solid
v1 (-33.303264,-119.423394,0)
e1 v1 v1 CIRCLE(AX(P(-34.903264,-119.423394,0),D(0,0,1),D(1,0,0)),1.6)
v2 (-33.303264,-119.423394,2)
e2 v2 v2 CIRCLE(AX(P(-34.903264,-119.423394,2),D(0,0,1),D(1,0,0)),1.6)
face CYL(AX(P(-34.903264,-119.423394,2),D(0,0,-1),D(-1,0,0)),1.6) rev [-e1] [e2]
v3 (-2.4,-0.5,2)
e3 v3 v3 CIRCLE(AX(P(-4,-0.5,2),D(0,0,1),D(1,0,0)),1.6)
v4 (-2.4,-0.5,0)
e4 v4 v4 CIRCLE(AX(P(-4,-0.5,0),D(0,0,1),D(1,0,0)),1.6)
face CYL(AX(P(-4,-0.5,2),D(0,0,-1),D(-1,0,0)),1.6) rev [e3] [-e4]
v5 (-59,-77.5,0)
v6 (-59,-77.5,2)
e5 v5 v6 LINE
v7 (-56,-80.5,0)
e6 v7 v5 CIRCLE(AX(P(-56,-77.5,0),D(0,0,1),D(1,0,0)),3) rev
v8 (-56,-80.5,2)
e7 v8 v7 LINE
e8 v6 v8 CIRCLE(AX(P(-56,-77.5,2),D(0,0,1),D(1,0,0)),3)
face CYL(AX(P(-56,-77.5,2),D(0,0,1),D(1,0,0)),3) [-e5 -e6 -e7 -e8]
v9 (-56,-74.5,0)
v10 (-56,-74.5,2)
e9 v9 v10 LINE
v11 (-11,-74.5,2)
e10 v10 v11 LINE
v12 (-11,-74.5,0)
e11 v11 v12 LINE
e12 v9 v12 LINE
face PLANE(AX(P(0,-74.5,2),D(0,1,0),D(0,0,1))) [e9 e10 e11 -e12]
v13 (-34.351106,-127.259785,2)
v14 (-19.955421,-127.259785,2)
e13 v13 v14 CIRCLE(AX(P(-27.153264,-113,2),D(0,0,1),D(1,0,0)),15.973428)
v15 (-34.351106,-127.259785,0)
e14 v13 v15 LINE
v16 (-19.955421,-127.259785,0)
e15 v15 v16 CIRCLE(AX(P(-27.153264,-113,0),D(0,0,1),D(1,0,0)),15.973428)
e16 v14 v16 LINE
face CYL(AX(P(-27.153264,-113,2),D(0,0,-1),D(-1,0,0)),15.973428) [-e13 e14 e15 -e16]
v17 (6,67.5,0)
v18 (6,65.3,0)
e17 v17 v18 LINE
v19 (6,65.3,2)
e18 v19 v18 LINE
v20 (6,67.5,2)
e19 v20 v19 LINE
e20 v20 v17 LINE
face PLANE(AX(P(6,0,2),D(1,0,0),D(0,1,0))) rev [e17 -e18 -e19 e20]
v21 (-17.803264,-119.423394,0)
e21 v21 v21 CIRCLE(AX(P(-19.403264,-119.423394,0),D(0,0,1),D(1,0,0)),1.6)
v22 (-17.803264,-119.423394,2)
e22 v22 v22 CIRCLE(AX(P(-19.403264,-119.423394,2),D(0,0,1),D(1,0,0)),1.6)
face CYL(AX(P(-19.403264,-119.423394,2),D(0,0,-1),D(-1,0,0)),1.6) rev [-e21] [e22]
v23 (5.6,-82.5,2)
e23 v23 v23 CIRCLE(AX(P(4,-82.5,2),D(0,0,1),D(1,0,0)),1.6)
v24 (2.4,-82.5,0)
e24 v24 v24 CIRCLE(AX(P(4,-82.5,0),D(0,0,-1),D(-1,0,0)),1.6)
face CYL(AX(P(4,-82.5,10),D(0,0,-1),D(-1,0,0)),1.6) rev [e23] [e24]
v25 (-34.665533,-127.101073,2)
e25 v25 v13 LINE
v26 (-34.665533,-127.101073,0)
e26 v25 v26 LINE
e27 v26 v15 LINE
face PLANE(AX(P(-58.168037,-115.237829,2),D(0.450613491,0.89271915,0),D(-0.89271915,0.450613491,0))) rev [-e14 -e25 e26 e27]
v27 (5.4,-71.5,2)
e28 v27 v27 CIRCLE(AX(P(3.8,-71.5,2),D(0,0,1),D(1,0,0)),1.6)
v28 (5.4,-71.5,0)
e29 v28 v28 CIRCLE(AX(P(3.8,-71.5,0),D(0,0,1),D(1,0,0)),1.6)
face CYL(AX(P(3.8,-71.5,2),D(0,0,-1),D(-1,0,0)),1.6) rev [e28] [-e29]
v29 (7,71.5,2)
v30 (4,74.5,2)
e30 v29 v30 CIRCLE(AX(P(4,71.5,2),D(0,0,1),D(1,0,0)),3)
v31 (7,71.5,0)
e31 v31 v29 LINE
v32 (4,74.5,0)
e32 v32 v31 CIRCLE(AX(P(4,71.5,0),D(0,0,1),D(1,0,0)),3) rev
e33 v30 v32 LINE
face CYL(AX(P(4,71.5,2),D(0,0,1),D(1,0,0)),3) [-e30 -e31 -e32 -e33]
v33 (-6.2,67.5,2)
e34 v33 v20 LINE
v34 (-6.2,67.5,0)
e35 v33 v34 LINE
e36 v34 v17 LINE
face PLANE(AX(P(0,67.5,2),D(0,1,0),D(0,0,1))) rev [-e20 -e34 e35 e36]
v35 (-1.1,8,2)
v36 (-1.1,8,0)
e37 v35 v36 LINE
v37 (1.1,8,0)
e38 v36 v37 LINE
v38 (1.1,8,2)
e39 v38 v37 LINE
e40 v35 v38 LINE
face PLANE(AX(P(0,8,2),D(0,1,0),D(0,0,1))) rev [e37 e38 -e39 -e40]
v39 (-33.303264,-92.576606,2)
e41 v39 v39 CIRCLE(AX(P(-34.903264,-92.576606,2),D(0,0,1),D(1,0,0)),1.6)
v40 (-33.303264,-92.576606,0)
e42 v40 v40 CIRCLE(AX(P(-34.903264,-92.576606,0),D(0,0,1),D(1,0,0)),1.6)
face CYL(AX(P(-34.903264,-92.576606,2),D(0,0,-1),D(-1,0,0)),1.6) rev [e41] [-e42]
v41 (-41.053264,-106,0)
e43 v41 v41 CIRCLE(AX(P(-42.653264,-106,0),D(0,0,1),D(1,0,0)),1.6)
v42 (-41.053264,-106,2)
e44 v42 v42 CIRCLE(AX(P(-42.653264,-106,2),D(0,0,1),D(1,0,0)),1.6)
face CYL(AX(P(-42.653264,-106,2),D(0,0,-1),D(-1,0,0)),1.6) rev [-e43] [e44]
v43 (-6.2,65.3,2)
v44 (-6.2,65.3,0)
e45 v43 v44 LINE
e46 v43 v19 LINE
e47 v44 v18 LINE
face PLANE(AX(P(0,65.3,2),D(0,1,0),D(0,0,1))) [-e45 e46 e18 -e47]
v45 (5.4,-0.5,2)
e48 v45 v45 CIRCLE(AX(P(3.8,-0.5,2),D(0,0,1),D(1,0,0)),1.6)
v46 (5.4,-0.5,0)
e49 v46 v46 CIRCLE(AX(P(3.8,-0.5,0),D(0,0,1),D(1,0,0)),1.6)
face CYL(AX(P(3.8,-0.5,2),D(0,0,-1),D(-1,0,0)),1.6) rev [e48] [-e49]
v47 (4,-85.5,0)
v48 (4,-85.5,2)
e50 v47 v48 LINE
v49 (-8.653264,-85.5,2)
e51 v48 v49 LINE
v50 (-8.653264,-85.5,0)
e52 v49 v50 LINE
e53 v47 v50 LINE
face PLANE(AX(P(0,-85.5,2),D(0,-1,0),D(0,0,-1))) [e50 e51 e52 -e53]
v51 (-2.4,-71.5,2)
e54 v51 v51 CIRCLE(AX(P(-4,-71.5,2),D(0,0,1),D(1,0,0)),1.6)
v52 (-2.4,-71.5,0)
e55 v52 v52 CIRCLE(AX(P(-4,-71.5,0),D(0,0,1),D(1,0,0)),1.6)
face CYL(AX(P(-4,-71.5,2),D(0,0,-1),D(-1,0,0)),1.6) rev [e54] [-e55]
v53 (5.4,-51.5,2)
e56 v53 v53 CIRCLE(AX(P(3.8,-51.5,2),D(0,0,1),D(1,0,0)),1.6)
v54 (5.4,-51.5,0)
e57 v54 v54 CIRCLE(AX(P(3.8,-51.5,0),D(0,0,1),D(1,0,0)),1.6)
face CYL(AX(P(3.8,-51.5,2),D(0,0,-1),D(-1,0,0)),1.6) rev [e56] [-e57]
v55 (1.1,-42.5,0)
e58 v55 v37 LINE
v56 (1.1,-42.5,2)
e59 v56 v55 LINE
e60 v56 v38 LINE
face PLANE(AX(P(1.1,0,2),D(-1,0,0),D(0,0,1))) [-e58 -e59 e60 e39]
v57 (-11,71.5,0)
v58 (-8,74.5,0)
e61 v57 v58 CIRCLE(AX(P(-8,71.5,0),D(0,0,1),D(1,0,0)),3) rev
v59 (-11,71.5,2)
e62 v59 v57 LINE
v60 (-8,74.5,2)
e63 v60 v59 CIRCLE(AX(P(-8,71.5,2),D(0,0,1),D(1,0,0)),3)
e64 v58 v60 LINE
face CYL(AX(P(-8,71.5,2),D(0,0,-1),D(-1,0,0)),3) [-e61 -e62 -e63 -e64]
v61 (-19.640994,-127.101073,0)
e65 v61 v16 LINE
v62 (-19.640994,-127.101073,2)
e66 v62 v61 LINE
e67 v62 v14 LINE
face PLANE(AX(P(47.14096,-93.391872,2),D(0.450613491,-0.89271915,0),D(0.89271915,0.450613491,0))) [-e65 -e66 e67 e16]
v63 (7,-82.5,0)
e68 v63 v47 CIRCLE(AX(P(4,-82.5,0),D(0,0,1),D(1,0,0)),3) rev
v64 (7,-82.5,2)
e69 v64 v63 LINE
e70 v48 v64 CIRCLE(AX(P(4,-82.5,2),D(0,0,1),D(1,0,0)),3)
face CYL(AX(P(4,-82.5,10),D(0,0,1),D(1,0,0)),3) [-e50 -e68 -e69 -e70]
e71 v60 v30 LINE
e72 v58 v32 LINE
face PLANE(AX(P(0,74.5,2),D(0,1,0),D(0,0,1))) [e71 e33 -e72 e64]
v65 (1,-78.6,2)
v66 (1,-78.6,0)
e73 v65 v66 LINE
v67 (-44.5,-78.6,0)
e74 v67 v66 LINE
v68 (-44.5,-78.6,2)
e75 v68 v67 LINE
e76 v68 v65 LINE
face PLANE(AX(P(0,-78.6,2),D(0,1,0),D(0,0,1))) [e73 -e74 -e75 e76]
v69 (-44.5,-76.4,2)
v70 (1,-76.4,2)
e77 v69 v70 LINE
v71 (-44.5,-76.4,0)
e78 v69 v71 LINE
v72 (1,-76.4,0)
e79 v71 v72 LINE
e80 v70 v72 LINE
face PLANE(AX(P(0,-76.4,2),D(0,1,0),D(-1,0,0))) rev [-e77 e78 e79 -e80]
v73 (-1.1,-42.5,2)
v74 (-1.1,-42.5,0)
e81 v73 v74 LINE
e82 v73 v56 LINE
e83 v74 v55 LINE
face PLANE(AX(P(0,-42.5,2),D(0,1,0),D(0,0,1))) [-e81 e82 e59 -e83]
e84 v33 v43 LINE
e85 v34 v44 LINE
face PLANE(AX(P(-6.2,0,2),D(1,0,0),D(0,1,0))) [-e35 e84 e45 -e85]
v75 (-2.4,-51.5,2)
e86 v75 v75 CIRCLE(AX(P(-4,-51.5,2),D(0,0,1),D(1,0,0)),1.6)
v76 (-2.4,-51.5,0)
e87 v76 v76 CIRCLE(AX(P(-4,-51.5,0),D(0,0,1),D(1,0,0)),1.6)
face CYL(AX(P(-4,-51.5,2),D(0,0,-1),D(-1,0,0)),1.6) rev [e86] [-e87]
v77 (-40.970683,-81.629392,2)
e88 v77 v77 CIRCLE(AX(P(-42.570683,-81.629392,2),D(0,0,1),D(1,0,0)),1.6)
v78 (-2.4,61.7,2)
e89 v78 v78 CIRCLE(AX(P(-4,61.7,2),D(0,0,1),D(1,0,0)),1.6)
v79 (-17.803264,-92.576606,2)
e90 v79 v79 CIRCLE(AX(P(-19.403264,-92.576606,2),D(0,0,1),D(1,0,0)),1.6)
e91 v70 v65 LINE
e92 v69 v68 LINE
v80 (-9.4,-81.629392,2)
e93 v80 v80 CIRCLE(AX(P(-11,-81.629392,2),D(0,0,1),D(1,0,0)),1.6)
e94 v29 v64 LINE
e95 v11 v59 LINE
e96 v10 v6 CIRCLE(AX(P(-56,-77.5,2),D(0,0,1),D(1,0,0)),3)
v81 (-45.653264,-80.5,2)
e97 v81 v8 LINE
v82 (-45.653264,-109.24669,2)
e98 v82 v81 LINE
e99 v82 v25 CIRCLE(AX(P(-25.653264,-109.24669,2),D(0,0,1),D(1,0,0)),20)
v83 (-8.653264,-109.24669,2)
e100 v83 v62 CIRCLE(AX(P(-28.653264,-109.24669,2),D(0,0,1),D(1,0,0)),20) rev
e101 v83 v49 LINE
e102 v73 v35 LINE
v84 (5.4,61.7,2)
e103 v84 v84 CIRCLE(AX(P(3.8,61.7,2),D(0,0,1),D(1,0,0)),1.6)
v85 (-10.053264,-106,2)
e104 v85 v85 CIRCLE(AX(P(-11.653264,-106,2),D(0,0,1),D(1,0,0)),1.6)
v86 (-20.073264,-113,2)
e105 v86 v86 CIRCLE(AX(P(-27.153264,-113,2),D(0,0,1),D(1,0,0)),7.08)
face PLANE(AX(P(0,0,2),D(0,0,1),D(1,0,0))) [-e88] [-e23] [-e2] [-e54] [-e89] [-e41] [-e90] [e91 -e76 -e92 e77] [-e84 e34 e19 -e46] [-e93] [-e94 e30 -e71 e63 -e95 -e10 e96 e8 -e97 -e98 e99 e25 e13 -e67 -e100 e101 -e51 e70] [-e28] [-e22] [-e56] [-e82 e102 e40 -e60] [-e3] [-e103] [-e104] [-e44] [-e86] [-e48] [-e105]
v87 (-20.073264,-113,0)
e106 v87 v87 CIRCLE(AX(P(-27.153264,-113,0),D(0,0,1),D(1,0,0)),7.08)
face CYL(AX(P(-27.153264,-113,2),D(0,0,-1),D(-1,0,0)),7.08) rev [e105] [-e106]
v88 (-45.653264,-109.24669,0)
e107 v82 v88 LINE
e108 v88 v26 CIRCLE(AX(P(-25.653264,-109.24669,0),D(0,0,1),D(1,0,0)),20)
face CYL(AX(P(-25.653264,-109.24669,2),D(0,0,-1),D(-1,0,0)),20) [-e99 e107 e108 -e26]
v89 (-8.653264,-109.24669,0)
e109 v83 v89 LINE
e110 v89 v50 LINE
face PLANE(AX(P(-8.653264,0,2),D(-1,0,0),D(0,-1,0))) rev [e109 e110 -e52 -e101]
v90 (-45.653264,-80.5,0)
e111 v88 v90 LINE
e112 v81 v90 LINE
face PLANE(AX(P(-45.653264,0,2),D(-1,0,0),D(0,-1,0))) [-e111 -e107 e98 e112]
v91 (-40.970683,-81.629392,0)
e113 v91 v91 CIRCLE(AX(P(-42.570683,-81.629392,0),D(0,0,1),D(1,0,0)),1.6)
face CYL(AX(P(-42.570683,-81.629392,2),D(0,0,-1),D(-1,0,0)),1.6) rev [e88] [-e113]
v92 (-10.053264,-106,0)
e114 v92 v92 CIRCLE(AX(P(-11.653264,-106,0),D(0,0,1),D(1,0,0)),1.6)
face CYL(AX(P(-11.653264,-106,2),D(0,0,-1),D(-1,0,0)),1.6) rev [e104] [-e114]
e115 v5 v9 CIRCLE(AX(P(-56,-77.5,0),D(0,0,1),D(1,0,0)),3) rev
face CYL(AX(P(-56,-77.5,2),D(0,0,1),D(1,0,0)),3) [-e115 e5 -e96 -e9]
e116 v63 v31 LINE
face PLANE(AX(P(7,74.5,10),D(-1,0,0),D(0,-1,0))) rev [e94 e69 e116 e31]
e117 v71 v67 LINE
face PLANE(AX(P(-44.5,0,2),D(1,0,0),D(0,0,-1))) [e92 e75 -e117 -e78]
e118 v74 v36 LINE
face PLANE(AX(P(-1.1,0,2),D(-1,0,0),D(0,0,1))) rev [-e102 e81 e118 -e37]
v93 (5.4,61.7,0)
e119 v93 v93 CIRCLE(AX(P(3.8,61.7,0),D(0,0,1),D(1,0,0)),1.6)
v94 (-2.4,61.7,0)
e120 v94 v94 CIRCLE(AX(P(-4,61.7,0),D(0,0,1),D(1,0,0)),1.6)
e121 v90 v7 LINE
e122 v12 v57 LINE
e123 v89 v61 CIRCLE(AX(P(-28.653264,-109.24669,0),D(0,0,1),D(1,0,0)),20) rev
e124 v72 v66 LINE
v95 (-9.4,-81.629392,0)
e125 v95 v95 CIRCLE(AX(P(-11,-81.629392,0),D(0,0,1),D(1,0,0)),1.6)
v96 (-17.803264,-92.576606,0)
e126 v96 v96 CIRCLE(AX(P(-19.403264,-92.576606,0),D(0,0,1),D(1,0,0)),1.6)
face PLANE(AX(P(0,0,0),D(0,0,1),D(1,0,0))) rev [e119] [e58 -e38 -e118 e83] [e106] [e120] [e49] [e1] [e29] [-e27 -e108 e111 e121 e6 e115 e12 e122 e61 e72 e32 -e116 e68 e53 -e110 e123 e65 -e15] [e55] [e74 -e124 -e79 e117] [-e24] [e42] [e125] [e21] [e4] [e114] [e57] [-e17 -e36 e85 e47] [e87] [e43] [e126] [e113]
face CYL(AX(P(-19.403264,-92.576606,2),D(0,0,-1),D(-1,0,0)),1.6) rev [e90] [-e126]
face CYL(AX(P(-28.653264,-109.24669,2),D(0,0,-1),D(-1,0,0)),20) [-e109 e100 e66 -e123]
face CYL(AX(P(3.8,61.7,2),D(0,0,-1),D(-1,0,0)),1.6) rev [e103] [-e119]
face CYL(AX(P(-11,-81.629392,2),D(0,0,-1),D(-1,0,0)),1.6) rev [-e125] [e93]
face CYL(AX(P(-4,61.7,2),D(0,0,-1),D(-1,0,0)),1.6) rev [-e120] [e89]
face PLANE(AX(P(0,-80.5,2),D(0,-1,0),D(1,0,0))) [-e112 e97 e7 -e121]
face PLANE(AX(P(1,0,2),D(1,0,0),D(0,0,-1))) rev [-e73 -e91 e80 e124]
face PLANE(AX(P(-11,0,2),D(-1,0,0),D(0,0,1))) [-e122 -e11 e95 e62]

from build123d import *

# Parameters (mm, degrees)
SKETCH_1_R          = 1.6
SKETCH_1_W          = 45.5
SKETCH_1_H          = 2.2
SKETCH_1_W_2        = 2.2
SKETCH_1_H_2        = 50.5
SKETCH_1_W_3        = 12.2
SKETCH_1_R_2        = 7.08
EXTRUDE_1_DEPTH     = 2
SKETCH_2_W          = 4
SKETCH_2_H          = 160
CUT_EXTRUDE_1_DEPTH = 10
SKETCH_3_R          = 1.6
CUT_EXTRUDE_2_DEPTH = 10
FILLET_1_R          = 3


with BuildPart() as part:
    # 草图1 → 凸台-拉伸1 (new body)
    with BuildSketch(Plane.XY):
        with BuildLine():
            Line((-8.65326359, -109.246690295), (-8.65326359, -85.5))
            Line((-8.65326359, -85.5), (11, -85.5))
            Line((11, -85.5), (11, 74.5))
            Line((11, 74.5), (-11, 74.5))
            Line((-11, 74.5), (-11, -74.5))
            Line((-11, -74.5), (-59, -74.5))
            Line((-59, -74.5), (-59, -80.5))
            Line((-59, -80.5), (-45.65326359, -80.5))
            Line((-45.65326359, -80.5), (-45.65326359, -109.246690295))
            ThreePointArc((-45.65326359, -109.246690295), (-42.686252119, -119.728927736), (-34.665533413, -127.101073304))
            Line((-34.665533413, -127.101073304), (-34.351105887, -127.259785353))
            ThreePointArc((-34.351105887, -127.259785353), (-27.15326359, -128.973428312), (-19.955421292, -127.259785353))
            Line((-19.955421292, -127.259785353), (-19.640993767, -127.101073304))
            ThreePointArc((-19.640993767, -127.101073304), (-11.620275061, -119.728927736), (-8.65326359, -109.246690295))
        make_face()
        with Locations((-11, -81.629391896)):
            Circle(SKETCH_1_R, mode=Mode.SUBTRACT)
        with Locations((-42.570682945, -81.629391896)):
            Circle(SKETCH_1_R, mode=Mode.SUBTRACT)
        with Locations((-42.65326359, -106)):
            Circle(SKETCH_1_R, mode=Mode.SUBTRACT)
        with Locations((-34.90326359, -92.576606241)):
            Circle(SKETCH_1_R, mode=Mode.SUBTRACT)
        with Locations((-19.40326359, -92.576606241)):
            Circle(SKETCH_1_R, mode=Mode.SUBTRACT)
        with Locations((-11.65326359, -106)):
            Circle(SKETCH_1_R, mode=Mode.SUBTRACT)
        with Locations((-19.40326359, -119.423393759)):
            Circle(SKETCH_1_R, mode=Mode.SUBTRACT)
        with Locations((-34.90326359, -119.423393759)):
            Circle(SKETCH_1_R, mode=Mode.SUBTRACT)
        with Locations((-21.75, -77.5)):
            Rectangle(SKETCH_1_W, SKETCH_1_H, mode=Mode.SUBTRACT)
        with Locations((3.8, 61.7)):
            Circle(SKETCH_1_R, mode=Mode.SUBTRACT)
        with Locations((-4, -71.5)):
            Circle(SKETCH_1_R, mode=Mode.SUBTRACT)
        with Locations((3.8, -71.5)):
            Circle(SKETCH_1_R, mode=Mode.SUBTRACT)
        with Locations((-4, -51.5)):
            Circle(SKETCH_1_R, mode=Mode.SUBTRACT)
        with Locations((3.8, -51.5)):
            Circle(SKETCH_1_R, mode=Mode.SUBTRACT)
        with Locations((0, -17.25)):
            Rectangle(SKETCH_1_W_2, SKETCH_1_H_2, mode=Mode.SUBTRACT)
        with Locations((-4, -0.5)):
            Circle(SKETCH_1_R, mode=Mode.SUBTRACT)
        with Locations((3.8, -0.5)):
            Circle(SKETCH_1_R, mode=Mode.SUBTRACT)
        with Locations((-4, 61.7)):
            Circle(SKETCH_1_R, mode=Mode.SUBTRACT)
        with Locations((-0.1, 66.4)):
            Rectangle(SKETCH_1_W_3, SKETCH_1_H, mode=Mode.SUBTRACT)
        with Locations((-27.15326359, -113)):
            Circle(SKETCH_1_R_2, mode=Mode.SUBTRACT)
    extrude(amount=EXTRUDE_1_DEPTH)

    # 草图2 → 切除-拉伸1 (cut)
    with BuildSketch(Plane(origin=(0, 0, 0), x_dir=(-1, 0, 0), z_dir=(0, 0, -1))):
        with Locations((-9, -5.5)):
            Rectangle(SKETCH_2_W, SKETCH_2_H)
    extrude(amount=-CUT_EXTRUDE_1_DEPTH, mode=Mode.SUBTRACT)

    # 草图3 → 切除-拉伸2 (cut)
    with BuildSketch(Plane(origin=(0, 0, 0), x_dir=(-1, 0, 0), z_dir=(0, 0, -1))):
        with Locations((-4, -82.5)):
            Circle(SKETCH_3_R)
    extrude(amount=-CUT_EXTRUDE_2_DEPTH, mode=Mode.SUBTRACT)

    # 圆角1
    fillet_1_edges = [part.edges().sort_by_distance(p)[0] for p in [
        (7, 74.5, 1),
        (-11, 74.5, 1),
        (-59, -74.5, 1),
        (-59, -80.5, 1),
        (7, -85.5, 1),
    ]]
    fillet(fillet_1_edges, radius=FILLET_1_R - 0.0001)  # a hair under: the kernel refuses the full size


solid = part.part
